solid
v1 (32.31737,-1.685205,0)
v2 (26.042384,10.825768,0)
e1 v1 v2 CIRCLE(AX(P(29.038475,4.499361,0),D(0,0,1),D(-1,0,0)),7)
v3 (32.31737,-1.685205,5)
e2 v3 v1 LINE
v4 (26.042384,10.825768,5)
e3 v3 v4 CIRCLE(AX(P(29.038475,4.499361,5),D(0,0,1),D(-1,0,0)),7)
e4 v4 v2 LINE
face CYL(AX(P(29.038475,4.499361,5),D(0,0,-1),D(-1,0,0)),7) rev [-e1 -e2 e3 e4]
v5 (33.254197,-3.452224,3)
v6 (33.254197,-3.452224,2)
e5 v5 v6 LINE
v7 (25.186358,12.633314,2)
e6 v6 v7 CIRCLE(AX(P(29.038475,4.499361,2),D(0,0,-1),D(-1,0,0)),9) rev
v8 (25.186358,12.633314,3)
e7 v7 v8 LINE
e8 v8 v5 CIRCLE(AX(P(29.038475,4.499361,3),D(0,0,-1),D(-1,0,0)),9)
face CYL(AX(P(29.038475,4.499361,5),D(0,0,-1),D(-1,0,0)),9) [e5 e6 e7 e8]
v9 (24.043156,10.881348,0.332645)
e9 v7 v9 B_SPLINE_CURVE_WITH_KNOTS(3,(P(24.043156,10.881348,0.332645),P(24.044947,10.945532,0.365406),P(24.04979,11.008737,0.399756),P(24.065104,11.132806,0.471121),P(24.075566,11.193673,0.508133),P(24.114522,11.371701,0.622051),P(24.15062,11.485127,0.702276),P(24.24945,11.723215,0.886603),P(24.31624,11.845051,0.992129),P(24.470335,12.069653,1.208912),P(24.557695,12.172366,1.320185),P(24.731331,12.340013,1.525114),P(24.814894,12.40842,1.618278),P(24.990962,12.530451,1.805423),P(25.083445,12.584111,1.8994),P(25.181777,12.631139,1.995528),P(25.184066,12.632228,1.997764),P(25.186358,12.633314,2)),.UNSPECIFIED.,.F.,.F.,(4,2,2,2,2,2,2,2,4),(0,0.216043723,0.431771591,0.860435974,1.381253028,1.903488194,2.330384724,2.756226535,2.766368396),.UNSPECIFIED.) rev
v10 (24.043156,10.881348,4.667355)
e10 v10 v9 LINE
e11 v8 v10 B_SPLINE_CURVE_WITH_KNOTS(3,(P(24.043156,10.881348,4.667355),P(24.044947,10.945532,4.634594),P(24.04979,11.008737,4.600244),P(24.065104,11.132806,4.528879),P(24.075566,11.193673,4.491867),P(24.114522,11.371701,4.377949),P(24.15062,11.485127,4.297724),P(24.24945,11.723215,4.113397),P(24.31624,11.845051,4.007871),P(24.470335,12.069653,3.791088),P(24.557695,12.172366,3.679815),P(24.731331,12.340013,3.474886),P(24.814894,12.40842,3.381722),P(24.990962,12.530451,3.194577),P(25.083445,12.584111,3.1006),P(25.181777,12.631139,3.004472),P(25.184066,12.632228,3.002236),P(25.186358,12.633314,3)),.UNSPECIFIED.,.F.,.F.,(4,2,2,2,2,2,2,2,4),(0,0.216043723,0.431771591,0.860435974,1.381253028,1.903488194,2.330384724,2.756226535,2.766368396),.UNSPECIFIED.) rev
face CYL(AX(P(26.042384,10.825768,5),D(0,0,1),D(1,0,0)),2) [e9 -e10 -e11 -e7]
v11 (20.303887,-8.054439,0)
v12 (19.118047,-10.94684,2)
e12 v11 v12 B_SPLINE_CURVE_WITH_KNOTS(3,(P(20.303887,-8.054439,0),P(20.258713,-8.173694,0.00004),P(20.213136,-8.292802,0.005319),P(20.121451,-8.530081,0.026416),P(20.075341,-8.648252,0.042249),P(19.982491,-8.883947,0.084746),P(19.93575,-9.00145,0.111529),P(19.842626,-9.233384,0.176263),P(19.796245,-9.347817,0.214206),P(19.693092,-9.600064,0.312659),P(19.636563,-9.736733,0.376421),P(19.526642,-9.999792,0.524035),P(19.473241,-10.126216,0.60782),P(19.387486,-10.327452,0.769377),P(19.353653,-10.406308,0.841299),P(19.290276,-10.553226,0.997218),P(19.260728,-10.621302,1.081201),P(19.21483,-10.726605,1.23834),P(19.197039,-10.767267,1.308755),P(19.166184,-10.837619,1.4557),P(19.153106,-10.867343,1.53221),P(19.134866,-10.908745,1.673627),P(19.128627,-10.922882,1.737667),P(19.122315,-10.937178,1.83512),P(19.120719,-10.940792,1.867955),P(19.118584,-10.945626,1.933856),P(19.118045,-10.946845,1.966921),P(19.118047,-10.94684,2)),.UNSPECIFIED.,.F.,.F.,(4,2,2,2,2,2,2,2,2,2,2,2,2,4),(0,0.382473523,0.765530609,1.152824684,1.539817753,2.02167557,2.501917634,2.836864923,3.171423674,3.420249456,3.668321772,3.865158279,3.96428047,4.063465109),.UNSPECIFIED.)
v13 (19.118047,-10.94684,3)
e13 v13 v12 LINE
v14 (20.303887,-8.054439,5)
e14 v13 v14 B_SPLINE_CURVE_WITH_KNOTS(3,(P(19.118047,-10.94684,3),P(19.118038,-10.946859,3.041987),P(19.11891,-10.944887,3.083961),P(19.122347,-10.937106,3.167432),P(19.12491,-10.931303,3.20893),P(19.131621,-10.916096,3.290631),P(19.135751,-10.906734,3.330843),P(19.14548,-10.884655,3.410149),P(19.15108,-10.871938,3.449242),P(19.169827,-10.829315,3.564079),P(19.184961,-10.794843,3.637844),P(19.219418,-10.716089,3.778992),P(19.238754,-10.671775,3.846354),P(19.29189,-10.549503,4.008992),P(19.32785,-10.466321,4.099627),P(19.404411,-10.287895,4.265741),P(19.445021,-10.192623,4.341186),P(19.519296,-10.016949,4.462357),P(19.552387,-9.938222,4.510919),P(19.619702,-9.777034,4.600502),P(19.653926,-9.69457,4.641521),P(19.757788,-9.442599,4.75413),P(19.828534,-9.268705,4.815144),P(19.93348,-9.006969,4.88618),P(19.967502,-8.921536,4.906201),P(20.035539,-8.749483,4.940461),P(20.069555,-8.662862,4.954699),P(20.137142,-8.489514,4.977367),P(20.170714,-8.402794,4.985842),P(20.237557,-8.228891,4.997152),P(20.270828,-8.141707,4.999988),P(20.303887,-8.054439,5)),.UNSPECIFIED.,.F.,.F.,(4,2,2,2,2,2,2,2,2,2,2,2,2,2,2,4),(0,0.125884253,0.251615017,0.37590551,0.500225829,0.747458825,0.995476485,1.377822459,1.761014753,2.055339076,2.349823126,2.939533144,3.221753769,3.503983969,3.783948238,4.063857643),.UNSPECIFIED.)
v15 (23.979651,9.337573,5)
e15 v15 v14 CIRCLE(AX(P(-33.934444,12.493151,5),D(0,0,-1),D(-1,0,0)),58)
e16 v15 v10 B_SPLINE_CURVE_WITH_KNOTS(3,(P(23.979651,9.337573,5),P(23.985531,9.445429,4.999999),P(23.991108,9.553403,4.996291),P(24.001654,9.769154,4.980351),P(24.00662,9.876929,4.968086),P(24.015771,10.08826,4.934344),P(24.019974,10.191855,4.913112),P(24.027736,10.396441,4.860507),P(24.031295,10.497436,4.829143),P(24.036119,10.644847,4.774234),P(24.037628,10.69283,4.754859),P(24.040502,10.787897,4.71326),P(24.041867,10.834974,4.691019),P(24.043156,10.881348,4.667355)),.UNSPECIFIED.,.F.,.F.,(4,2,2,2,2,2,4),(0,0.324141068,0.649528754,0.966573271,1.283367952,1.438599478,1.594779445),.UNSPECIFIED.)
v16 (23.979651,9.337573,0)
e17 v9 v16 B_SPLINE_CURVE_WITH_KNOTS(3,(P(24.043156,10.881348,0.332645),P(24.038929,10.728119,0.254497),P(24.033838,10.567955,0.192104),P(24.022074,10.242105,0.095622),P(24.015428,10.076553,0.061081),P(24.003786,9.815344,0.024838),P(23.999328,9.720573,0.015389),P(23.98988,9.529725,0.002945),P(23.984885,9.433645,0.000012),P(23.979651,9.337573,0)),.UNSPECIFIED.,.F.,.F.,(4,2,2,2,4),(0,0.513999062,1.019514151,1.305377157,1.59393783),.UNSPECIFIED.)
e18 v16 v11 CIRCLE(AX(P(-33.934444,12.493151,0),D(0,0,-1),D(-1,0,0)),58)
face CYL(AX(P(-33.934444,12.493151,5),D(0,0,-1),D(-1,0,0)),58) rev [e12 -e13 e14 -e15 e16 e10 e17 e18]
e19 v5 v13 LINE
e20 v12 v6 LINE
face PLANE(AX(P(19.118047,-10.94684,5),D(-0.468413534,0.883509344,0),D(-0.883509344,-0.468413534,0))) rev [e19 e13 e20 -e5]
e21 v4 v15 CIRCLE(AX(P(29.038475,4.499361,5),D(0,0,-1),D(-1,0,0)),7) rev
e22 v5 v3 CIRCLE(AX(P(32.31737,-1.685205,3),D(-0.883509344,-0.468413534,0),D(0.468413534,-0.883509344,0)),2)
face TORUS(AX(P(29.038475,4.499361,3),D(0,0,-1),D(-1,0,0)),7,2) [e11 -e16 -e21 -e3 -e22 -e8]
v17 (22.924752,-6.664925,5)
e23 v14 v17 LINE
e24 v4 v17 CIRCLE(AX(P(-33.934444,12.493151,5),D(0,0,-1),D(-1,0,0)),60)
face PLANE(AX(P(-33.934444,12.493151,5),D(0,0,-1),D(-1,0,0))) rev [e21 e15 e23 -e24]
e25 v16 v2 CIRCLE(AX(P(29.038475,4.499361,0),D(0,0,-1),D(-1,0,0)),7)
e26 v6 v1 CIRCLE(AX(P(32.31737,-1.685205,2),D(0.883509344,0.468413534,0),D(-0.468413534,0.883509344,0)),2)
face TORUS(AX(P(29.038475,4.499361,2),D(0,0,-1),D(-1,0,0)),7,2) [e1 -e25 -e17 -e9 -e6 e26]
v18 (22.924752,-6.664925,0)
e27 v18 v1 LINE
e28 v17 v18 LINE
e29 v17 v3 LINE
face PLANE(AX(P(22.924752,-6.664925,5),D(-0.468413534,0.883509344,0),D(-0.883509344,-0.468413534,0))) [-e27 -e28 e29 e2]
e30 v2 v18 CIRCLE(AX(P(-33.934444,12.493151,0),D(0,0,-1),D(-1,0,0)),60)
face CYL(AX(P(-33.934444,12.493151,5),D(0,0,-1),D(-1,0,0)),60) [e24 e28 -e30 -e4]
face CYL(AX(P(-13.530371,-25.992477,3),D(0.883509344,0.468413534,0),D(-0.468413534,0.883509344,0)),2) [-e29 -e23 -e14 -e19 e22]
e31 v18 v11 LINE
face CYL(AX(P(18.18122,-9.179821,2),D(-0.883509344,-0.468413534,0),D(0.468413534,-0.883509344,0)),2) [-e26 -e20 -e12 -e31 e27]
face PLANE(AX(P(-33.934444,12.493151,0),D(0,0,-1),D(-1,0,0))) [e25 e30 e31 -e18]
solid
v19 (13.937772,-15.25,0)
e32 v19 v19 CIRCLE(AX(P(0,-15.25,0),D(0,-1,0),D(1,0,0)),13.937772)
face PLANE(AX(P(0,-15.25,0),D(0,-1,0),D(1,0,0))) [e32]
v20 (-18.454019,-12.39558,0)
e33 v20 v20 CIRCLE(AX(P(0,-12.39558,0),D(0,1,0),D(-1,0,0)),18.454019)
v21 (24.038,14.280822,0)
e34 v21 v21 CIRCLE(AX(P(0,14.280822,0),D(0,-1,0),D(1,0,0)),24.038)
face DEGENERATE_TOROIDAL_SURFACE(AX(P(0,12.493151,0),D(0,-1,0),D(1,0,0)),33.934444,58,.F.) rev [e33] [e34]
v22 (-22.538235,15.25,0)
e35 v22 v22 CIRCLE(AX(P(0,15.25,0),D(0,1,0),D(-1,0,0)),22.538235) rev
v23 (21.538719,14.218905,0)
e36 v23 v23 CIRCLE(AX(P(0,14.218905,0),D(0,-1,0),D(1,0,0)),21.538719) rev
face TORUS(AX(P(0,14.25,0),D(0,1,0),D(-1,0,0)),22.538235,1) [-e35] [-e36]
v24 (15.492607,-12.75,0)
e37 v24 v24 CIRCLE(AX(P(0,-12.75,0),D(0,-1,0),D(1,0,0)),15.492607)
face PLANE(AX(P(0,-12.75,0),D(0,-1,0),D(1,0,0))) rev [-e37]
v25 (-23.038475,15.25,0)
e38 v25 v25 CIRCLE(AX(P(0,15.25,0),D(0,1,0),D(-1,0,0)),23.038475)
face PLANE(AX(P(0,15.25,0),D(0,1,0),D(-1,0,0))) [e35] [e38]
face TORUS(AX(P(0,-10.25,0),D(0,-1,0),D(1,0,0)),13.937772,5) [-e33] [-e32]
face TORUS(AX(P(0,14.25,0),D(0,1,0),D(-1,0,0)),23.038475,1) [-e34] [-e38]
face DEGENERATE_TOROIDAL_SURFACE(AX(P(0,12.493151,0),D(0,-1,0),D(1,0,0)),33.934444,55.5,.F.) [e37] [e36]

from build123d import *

# Parameters (mm, degrees)
CROQUIS6_R              = 21.5
SALIENTE_EXTRUIR1_DEPTH = 0.1
REDONDEO2_R             = 1
REDONDEO3_R             = 5
SALIENTE_EXTRUIR2_DEPTH = 5
REDONDEO4_R             = 2


# Read off the part's stored shape, not the designer's step: Vaciado2
with BuildPart() as part:
    # Croquis3 → Revolución1 (revolve)
    with BuildSketch(Plane.XY):
        with BuildLine():
            Line((0, -15.25), (0, 15.25))
            Line((0, 15.25), (24, 15.25))
            ThreePointArc((24, 15.25), (22.595823948, -0.481008775), (17, -15.25))
            Line((17, -15.25), (0, -15.25))
        make_face()
    revolve(axis=Axis((0, -15.25, 0), (0, 1, 0)))

    # Croquis6 → Saliente-Extruir1 (add)
    with BuildSketch(Plane(origin=(0, 15.25, 0), x_dir=(1, 0, 0), z_dir=(0, 1, 0))):
        Circle(CROQUIS6_R)
    extrude(amount=-SALIENTE_EXTRUIR1_DEPTH)

    # Vaciado2 outline → Vaciado2 (revolve, cut)
    with BuildSketch(Plane.XY):
        with BuildLine():
            Line((0, 15.25), (0, -12.75))
            Line((0, -12.75), (15.492606695, -12.75))
            ThreePointArc((15.492606695, -12.75), (20.331827808, 0.856065473), (21.497043449, 15.25))
            Line((21.497043449, 15.25), (0, 15.25))
        make_face()
    revolve(axis=Axis((0, 0, 0), (0, 1, 0)), mode=Mode.SUBTRACT)

    # Redondeo2
    redondeo2_edges = [part.edges().sort_by_distance(p)[0] for p in [
        (-21.497043449, 15.25, 0),
        (-24, 15.25, 0),
    ]]
    fillet(redondeo2_edges, radius=REDONDEO2_R)

    # Redondeo3
    redondeo3_edges = [part.edges().sort_by_distance(p)[0] for p in [
        (-17, -15.25, 0),
    ]]
    fillet(redondeo3_edges, radius=REDONDEO3_R)


with BuildPart() as body_2:
    # Croquis15 → Saliente-Extruir2 (new body)
    with BuildSketch(Plane.XY):
        with BuildLine():
            Line((19.118047296, -10.94684007), (33.254196803, -3.452223528))
            ThreePointArc((33.254196803, -3.452223528), (36.773561649, 9.100277273), (24.063453665, 11.999304752))
            ThreePointArc((24.063453665, 11.999304752), (22.763691887, 0.273437288), (19.118047296, -10.94684007))
        make_face()
        with BuildLine():
            Line((22.92475169, -6.664925133), (32.317369735, -1.68520484))
            ThreePointArc((32.317369735, -1.68520484), (35.295559587, 7.637655082), (26.042383639, 10.825768442))
            ThreePointArc((26.042383639, 10.825768442), (25.134542596, 1.964388506), (22.92475169, -6.664925133))
        make_face(mode=Mode.SUBTRACT)
    extrude(amount=SALIENTE_EXTRUIR2_DEPTH)

    # Redondeo4
    redondeo4_edges = [body_2.edges().sort_by_distance(p)[0] for p in [
        (36.773561649, 9.100277273, 5),
        (36.773561649, 9.100277273, 0),
        (26.186122049, -7.199531799, 0),
        (24.063453665, 11.999304752, 2.5),
        (26.186122049, -7.199531799, 5),
    ]]
    fillet(redondeo4_edges, radius=REDONDEO4_R - 0.0001)  # a hair under: the kernel refuses the full size


solid = Compound([part.part, body_2.part])
